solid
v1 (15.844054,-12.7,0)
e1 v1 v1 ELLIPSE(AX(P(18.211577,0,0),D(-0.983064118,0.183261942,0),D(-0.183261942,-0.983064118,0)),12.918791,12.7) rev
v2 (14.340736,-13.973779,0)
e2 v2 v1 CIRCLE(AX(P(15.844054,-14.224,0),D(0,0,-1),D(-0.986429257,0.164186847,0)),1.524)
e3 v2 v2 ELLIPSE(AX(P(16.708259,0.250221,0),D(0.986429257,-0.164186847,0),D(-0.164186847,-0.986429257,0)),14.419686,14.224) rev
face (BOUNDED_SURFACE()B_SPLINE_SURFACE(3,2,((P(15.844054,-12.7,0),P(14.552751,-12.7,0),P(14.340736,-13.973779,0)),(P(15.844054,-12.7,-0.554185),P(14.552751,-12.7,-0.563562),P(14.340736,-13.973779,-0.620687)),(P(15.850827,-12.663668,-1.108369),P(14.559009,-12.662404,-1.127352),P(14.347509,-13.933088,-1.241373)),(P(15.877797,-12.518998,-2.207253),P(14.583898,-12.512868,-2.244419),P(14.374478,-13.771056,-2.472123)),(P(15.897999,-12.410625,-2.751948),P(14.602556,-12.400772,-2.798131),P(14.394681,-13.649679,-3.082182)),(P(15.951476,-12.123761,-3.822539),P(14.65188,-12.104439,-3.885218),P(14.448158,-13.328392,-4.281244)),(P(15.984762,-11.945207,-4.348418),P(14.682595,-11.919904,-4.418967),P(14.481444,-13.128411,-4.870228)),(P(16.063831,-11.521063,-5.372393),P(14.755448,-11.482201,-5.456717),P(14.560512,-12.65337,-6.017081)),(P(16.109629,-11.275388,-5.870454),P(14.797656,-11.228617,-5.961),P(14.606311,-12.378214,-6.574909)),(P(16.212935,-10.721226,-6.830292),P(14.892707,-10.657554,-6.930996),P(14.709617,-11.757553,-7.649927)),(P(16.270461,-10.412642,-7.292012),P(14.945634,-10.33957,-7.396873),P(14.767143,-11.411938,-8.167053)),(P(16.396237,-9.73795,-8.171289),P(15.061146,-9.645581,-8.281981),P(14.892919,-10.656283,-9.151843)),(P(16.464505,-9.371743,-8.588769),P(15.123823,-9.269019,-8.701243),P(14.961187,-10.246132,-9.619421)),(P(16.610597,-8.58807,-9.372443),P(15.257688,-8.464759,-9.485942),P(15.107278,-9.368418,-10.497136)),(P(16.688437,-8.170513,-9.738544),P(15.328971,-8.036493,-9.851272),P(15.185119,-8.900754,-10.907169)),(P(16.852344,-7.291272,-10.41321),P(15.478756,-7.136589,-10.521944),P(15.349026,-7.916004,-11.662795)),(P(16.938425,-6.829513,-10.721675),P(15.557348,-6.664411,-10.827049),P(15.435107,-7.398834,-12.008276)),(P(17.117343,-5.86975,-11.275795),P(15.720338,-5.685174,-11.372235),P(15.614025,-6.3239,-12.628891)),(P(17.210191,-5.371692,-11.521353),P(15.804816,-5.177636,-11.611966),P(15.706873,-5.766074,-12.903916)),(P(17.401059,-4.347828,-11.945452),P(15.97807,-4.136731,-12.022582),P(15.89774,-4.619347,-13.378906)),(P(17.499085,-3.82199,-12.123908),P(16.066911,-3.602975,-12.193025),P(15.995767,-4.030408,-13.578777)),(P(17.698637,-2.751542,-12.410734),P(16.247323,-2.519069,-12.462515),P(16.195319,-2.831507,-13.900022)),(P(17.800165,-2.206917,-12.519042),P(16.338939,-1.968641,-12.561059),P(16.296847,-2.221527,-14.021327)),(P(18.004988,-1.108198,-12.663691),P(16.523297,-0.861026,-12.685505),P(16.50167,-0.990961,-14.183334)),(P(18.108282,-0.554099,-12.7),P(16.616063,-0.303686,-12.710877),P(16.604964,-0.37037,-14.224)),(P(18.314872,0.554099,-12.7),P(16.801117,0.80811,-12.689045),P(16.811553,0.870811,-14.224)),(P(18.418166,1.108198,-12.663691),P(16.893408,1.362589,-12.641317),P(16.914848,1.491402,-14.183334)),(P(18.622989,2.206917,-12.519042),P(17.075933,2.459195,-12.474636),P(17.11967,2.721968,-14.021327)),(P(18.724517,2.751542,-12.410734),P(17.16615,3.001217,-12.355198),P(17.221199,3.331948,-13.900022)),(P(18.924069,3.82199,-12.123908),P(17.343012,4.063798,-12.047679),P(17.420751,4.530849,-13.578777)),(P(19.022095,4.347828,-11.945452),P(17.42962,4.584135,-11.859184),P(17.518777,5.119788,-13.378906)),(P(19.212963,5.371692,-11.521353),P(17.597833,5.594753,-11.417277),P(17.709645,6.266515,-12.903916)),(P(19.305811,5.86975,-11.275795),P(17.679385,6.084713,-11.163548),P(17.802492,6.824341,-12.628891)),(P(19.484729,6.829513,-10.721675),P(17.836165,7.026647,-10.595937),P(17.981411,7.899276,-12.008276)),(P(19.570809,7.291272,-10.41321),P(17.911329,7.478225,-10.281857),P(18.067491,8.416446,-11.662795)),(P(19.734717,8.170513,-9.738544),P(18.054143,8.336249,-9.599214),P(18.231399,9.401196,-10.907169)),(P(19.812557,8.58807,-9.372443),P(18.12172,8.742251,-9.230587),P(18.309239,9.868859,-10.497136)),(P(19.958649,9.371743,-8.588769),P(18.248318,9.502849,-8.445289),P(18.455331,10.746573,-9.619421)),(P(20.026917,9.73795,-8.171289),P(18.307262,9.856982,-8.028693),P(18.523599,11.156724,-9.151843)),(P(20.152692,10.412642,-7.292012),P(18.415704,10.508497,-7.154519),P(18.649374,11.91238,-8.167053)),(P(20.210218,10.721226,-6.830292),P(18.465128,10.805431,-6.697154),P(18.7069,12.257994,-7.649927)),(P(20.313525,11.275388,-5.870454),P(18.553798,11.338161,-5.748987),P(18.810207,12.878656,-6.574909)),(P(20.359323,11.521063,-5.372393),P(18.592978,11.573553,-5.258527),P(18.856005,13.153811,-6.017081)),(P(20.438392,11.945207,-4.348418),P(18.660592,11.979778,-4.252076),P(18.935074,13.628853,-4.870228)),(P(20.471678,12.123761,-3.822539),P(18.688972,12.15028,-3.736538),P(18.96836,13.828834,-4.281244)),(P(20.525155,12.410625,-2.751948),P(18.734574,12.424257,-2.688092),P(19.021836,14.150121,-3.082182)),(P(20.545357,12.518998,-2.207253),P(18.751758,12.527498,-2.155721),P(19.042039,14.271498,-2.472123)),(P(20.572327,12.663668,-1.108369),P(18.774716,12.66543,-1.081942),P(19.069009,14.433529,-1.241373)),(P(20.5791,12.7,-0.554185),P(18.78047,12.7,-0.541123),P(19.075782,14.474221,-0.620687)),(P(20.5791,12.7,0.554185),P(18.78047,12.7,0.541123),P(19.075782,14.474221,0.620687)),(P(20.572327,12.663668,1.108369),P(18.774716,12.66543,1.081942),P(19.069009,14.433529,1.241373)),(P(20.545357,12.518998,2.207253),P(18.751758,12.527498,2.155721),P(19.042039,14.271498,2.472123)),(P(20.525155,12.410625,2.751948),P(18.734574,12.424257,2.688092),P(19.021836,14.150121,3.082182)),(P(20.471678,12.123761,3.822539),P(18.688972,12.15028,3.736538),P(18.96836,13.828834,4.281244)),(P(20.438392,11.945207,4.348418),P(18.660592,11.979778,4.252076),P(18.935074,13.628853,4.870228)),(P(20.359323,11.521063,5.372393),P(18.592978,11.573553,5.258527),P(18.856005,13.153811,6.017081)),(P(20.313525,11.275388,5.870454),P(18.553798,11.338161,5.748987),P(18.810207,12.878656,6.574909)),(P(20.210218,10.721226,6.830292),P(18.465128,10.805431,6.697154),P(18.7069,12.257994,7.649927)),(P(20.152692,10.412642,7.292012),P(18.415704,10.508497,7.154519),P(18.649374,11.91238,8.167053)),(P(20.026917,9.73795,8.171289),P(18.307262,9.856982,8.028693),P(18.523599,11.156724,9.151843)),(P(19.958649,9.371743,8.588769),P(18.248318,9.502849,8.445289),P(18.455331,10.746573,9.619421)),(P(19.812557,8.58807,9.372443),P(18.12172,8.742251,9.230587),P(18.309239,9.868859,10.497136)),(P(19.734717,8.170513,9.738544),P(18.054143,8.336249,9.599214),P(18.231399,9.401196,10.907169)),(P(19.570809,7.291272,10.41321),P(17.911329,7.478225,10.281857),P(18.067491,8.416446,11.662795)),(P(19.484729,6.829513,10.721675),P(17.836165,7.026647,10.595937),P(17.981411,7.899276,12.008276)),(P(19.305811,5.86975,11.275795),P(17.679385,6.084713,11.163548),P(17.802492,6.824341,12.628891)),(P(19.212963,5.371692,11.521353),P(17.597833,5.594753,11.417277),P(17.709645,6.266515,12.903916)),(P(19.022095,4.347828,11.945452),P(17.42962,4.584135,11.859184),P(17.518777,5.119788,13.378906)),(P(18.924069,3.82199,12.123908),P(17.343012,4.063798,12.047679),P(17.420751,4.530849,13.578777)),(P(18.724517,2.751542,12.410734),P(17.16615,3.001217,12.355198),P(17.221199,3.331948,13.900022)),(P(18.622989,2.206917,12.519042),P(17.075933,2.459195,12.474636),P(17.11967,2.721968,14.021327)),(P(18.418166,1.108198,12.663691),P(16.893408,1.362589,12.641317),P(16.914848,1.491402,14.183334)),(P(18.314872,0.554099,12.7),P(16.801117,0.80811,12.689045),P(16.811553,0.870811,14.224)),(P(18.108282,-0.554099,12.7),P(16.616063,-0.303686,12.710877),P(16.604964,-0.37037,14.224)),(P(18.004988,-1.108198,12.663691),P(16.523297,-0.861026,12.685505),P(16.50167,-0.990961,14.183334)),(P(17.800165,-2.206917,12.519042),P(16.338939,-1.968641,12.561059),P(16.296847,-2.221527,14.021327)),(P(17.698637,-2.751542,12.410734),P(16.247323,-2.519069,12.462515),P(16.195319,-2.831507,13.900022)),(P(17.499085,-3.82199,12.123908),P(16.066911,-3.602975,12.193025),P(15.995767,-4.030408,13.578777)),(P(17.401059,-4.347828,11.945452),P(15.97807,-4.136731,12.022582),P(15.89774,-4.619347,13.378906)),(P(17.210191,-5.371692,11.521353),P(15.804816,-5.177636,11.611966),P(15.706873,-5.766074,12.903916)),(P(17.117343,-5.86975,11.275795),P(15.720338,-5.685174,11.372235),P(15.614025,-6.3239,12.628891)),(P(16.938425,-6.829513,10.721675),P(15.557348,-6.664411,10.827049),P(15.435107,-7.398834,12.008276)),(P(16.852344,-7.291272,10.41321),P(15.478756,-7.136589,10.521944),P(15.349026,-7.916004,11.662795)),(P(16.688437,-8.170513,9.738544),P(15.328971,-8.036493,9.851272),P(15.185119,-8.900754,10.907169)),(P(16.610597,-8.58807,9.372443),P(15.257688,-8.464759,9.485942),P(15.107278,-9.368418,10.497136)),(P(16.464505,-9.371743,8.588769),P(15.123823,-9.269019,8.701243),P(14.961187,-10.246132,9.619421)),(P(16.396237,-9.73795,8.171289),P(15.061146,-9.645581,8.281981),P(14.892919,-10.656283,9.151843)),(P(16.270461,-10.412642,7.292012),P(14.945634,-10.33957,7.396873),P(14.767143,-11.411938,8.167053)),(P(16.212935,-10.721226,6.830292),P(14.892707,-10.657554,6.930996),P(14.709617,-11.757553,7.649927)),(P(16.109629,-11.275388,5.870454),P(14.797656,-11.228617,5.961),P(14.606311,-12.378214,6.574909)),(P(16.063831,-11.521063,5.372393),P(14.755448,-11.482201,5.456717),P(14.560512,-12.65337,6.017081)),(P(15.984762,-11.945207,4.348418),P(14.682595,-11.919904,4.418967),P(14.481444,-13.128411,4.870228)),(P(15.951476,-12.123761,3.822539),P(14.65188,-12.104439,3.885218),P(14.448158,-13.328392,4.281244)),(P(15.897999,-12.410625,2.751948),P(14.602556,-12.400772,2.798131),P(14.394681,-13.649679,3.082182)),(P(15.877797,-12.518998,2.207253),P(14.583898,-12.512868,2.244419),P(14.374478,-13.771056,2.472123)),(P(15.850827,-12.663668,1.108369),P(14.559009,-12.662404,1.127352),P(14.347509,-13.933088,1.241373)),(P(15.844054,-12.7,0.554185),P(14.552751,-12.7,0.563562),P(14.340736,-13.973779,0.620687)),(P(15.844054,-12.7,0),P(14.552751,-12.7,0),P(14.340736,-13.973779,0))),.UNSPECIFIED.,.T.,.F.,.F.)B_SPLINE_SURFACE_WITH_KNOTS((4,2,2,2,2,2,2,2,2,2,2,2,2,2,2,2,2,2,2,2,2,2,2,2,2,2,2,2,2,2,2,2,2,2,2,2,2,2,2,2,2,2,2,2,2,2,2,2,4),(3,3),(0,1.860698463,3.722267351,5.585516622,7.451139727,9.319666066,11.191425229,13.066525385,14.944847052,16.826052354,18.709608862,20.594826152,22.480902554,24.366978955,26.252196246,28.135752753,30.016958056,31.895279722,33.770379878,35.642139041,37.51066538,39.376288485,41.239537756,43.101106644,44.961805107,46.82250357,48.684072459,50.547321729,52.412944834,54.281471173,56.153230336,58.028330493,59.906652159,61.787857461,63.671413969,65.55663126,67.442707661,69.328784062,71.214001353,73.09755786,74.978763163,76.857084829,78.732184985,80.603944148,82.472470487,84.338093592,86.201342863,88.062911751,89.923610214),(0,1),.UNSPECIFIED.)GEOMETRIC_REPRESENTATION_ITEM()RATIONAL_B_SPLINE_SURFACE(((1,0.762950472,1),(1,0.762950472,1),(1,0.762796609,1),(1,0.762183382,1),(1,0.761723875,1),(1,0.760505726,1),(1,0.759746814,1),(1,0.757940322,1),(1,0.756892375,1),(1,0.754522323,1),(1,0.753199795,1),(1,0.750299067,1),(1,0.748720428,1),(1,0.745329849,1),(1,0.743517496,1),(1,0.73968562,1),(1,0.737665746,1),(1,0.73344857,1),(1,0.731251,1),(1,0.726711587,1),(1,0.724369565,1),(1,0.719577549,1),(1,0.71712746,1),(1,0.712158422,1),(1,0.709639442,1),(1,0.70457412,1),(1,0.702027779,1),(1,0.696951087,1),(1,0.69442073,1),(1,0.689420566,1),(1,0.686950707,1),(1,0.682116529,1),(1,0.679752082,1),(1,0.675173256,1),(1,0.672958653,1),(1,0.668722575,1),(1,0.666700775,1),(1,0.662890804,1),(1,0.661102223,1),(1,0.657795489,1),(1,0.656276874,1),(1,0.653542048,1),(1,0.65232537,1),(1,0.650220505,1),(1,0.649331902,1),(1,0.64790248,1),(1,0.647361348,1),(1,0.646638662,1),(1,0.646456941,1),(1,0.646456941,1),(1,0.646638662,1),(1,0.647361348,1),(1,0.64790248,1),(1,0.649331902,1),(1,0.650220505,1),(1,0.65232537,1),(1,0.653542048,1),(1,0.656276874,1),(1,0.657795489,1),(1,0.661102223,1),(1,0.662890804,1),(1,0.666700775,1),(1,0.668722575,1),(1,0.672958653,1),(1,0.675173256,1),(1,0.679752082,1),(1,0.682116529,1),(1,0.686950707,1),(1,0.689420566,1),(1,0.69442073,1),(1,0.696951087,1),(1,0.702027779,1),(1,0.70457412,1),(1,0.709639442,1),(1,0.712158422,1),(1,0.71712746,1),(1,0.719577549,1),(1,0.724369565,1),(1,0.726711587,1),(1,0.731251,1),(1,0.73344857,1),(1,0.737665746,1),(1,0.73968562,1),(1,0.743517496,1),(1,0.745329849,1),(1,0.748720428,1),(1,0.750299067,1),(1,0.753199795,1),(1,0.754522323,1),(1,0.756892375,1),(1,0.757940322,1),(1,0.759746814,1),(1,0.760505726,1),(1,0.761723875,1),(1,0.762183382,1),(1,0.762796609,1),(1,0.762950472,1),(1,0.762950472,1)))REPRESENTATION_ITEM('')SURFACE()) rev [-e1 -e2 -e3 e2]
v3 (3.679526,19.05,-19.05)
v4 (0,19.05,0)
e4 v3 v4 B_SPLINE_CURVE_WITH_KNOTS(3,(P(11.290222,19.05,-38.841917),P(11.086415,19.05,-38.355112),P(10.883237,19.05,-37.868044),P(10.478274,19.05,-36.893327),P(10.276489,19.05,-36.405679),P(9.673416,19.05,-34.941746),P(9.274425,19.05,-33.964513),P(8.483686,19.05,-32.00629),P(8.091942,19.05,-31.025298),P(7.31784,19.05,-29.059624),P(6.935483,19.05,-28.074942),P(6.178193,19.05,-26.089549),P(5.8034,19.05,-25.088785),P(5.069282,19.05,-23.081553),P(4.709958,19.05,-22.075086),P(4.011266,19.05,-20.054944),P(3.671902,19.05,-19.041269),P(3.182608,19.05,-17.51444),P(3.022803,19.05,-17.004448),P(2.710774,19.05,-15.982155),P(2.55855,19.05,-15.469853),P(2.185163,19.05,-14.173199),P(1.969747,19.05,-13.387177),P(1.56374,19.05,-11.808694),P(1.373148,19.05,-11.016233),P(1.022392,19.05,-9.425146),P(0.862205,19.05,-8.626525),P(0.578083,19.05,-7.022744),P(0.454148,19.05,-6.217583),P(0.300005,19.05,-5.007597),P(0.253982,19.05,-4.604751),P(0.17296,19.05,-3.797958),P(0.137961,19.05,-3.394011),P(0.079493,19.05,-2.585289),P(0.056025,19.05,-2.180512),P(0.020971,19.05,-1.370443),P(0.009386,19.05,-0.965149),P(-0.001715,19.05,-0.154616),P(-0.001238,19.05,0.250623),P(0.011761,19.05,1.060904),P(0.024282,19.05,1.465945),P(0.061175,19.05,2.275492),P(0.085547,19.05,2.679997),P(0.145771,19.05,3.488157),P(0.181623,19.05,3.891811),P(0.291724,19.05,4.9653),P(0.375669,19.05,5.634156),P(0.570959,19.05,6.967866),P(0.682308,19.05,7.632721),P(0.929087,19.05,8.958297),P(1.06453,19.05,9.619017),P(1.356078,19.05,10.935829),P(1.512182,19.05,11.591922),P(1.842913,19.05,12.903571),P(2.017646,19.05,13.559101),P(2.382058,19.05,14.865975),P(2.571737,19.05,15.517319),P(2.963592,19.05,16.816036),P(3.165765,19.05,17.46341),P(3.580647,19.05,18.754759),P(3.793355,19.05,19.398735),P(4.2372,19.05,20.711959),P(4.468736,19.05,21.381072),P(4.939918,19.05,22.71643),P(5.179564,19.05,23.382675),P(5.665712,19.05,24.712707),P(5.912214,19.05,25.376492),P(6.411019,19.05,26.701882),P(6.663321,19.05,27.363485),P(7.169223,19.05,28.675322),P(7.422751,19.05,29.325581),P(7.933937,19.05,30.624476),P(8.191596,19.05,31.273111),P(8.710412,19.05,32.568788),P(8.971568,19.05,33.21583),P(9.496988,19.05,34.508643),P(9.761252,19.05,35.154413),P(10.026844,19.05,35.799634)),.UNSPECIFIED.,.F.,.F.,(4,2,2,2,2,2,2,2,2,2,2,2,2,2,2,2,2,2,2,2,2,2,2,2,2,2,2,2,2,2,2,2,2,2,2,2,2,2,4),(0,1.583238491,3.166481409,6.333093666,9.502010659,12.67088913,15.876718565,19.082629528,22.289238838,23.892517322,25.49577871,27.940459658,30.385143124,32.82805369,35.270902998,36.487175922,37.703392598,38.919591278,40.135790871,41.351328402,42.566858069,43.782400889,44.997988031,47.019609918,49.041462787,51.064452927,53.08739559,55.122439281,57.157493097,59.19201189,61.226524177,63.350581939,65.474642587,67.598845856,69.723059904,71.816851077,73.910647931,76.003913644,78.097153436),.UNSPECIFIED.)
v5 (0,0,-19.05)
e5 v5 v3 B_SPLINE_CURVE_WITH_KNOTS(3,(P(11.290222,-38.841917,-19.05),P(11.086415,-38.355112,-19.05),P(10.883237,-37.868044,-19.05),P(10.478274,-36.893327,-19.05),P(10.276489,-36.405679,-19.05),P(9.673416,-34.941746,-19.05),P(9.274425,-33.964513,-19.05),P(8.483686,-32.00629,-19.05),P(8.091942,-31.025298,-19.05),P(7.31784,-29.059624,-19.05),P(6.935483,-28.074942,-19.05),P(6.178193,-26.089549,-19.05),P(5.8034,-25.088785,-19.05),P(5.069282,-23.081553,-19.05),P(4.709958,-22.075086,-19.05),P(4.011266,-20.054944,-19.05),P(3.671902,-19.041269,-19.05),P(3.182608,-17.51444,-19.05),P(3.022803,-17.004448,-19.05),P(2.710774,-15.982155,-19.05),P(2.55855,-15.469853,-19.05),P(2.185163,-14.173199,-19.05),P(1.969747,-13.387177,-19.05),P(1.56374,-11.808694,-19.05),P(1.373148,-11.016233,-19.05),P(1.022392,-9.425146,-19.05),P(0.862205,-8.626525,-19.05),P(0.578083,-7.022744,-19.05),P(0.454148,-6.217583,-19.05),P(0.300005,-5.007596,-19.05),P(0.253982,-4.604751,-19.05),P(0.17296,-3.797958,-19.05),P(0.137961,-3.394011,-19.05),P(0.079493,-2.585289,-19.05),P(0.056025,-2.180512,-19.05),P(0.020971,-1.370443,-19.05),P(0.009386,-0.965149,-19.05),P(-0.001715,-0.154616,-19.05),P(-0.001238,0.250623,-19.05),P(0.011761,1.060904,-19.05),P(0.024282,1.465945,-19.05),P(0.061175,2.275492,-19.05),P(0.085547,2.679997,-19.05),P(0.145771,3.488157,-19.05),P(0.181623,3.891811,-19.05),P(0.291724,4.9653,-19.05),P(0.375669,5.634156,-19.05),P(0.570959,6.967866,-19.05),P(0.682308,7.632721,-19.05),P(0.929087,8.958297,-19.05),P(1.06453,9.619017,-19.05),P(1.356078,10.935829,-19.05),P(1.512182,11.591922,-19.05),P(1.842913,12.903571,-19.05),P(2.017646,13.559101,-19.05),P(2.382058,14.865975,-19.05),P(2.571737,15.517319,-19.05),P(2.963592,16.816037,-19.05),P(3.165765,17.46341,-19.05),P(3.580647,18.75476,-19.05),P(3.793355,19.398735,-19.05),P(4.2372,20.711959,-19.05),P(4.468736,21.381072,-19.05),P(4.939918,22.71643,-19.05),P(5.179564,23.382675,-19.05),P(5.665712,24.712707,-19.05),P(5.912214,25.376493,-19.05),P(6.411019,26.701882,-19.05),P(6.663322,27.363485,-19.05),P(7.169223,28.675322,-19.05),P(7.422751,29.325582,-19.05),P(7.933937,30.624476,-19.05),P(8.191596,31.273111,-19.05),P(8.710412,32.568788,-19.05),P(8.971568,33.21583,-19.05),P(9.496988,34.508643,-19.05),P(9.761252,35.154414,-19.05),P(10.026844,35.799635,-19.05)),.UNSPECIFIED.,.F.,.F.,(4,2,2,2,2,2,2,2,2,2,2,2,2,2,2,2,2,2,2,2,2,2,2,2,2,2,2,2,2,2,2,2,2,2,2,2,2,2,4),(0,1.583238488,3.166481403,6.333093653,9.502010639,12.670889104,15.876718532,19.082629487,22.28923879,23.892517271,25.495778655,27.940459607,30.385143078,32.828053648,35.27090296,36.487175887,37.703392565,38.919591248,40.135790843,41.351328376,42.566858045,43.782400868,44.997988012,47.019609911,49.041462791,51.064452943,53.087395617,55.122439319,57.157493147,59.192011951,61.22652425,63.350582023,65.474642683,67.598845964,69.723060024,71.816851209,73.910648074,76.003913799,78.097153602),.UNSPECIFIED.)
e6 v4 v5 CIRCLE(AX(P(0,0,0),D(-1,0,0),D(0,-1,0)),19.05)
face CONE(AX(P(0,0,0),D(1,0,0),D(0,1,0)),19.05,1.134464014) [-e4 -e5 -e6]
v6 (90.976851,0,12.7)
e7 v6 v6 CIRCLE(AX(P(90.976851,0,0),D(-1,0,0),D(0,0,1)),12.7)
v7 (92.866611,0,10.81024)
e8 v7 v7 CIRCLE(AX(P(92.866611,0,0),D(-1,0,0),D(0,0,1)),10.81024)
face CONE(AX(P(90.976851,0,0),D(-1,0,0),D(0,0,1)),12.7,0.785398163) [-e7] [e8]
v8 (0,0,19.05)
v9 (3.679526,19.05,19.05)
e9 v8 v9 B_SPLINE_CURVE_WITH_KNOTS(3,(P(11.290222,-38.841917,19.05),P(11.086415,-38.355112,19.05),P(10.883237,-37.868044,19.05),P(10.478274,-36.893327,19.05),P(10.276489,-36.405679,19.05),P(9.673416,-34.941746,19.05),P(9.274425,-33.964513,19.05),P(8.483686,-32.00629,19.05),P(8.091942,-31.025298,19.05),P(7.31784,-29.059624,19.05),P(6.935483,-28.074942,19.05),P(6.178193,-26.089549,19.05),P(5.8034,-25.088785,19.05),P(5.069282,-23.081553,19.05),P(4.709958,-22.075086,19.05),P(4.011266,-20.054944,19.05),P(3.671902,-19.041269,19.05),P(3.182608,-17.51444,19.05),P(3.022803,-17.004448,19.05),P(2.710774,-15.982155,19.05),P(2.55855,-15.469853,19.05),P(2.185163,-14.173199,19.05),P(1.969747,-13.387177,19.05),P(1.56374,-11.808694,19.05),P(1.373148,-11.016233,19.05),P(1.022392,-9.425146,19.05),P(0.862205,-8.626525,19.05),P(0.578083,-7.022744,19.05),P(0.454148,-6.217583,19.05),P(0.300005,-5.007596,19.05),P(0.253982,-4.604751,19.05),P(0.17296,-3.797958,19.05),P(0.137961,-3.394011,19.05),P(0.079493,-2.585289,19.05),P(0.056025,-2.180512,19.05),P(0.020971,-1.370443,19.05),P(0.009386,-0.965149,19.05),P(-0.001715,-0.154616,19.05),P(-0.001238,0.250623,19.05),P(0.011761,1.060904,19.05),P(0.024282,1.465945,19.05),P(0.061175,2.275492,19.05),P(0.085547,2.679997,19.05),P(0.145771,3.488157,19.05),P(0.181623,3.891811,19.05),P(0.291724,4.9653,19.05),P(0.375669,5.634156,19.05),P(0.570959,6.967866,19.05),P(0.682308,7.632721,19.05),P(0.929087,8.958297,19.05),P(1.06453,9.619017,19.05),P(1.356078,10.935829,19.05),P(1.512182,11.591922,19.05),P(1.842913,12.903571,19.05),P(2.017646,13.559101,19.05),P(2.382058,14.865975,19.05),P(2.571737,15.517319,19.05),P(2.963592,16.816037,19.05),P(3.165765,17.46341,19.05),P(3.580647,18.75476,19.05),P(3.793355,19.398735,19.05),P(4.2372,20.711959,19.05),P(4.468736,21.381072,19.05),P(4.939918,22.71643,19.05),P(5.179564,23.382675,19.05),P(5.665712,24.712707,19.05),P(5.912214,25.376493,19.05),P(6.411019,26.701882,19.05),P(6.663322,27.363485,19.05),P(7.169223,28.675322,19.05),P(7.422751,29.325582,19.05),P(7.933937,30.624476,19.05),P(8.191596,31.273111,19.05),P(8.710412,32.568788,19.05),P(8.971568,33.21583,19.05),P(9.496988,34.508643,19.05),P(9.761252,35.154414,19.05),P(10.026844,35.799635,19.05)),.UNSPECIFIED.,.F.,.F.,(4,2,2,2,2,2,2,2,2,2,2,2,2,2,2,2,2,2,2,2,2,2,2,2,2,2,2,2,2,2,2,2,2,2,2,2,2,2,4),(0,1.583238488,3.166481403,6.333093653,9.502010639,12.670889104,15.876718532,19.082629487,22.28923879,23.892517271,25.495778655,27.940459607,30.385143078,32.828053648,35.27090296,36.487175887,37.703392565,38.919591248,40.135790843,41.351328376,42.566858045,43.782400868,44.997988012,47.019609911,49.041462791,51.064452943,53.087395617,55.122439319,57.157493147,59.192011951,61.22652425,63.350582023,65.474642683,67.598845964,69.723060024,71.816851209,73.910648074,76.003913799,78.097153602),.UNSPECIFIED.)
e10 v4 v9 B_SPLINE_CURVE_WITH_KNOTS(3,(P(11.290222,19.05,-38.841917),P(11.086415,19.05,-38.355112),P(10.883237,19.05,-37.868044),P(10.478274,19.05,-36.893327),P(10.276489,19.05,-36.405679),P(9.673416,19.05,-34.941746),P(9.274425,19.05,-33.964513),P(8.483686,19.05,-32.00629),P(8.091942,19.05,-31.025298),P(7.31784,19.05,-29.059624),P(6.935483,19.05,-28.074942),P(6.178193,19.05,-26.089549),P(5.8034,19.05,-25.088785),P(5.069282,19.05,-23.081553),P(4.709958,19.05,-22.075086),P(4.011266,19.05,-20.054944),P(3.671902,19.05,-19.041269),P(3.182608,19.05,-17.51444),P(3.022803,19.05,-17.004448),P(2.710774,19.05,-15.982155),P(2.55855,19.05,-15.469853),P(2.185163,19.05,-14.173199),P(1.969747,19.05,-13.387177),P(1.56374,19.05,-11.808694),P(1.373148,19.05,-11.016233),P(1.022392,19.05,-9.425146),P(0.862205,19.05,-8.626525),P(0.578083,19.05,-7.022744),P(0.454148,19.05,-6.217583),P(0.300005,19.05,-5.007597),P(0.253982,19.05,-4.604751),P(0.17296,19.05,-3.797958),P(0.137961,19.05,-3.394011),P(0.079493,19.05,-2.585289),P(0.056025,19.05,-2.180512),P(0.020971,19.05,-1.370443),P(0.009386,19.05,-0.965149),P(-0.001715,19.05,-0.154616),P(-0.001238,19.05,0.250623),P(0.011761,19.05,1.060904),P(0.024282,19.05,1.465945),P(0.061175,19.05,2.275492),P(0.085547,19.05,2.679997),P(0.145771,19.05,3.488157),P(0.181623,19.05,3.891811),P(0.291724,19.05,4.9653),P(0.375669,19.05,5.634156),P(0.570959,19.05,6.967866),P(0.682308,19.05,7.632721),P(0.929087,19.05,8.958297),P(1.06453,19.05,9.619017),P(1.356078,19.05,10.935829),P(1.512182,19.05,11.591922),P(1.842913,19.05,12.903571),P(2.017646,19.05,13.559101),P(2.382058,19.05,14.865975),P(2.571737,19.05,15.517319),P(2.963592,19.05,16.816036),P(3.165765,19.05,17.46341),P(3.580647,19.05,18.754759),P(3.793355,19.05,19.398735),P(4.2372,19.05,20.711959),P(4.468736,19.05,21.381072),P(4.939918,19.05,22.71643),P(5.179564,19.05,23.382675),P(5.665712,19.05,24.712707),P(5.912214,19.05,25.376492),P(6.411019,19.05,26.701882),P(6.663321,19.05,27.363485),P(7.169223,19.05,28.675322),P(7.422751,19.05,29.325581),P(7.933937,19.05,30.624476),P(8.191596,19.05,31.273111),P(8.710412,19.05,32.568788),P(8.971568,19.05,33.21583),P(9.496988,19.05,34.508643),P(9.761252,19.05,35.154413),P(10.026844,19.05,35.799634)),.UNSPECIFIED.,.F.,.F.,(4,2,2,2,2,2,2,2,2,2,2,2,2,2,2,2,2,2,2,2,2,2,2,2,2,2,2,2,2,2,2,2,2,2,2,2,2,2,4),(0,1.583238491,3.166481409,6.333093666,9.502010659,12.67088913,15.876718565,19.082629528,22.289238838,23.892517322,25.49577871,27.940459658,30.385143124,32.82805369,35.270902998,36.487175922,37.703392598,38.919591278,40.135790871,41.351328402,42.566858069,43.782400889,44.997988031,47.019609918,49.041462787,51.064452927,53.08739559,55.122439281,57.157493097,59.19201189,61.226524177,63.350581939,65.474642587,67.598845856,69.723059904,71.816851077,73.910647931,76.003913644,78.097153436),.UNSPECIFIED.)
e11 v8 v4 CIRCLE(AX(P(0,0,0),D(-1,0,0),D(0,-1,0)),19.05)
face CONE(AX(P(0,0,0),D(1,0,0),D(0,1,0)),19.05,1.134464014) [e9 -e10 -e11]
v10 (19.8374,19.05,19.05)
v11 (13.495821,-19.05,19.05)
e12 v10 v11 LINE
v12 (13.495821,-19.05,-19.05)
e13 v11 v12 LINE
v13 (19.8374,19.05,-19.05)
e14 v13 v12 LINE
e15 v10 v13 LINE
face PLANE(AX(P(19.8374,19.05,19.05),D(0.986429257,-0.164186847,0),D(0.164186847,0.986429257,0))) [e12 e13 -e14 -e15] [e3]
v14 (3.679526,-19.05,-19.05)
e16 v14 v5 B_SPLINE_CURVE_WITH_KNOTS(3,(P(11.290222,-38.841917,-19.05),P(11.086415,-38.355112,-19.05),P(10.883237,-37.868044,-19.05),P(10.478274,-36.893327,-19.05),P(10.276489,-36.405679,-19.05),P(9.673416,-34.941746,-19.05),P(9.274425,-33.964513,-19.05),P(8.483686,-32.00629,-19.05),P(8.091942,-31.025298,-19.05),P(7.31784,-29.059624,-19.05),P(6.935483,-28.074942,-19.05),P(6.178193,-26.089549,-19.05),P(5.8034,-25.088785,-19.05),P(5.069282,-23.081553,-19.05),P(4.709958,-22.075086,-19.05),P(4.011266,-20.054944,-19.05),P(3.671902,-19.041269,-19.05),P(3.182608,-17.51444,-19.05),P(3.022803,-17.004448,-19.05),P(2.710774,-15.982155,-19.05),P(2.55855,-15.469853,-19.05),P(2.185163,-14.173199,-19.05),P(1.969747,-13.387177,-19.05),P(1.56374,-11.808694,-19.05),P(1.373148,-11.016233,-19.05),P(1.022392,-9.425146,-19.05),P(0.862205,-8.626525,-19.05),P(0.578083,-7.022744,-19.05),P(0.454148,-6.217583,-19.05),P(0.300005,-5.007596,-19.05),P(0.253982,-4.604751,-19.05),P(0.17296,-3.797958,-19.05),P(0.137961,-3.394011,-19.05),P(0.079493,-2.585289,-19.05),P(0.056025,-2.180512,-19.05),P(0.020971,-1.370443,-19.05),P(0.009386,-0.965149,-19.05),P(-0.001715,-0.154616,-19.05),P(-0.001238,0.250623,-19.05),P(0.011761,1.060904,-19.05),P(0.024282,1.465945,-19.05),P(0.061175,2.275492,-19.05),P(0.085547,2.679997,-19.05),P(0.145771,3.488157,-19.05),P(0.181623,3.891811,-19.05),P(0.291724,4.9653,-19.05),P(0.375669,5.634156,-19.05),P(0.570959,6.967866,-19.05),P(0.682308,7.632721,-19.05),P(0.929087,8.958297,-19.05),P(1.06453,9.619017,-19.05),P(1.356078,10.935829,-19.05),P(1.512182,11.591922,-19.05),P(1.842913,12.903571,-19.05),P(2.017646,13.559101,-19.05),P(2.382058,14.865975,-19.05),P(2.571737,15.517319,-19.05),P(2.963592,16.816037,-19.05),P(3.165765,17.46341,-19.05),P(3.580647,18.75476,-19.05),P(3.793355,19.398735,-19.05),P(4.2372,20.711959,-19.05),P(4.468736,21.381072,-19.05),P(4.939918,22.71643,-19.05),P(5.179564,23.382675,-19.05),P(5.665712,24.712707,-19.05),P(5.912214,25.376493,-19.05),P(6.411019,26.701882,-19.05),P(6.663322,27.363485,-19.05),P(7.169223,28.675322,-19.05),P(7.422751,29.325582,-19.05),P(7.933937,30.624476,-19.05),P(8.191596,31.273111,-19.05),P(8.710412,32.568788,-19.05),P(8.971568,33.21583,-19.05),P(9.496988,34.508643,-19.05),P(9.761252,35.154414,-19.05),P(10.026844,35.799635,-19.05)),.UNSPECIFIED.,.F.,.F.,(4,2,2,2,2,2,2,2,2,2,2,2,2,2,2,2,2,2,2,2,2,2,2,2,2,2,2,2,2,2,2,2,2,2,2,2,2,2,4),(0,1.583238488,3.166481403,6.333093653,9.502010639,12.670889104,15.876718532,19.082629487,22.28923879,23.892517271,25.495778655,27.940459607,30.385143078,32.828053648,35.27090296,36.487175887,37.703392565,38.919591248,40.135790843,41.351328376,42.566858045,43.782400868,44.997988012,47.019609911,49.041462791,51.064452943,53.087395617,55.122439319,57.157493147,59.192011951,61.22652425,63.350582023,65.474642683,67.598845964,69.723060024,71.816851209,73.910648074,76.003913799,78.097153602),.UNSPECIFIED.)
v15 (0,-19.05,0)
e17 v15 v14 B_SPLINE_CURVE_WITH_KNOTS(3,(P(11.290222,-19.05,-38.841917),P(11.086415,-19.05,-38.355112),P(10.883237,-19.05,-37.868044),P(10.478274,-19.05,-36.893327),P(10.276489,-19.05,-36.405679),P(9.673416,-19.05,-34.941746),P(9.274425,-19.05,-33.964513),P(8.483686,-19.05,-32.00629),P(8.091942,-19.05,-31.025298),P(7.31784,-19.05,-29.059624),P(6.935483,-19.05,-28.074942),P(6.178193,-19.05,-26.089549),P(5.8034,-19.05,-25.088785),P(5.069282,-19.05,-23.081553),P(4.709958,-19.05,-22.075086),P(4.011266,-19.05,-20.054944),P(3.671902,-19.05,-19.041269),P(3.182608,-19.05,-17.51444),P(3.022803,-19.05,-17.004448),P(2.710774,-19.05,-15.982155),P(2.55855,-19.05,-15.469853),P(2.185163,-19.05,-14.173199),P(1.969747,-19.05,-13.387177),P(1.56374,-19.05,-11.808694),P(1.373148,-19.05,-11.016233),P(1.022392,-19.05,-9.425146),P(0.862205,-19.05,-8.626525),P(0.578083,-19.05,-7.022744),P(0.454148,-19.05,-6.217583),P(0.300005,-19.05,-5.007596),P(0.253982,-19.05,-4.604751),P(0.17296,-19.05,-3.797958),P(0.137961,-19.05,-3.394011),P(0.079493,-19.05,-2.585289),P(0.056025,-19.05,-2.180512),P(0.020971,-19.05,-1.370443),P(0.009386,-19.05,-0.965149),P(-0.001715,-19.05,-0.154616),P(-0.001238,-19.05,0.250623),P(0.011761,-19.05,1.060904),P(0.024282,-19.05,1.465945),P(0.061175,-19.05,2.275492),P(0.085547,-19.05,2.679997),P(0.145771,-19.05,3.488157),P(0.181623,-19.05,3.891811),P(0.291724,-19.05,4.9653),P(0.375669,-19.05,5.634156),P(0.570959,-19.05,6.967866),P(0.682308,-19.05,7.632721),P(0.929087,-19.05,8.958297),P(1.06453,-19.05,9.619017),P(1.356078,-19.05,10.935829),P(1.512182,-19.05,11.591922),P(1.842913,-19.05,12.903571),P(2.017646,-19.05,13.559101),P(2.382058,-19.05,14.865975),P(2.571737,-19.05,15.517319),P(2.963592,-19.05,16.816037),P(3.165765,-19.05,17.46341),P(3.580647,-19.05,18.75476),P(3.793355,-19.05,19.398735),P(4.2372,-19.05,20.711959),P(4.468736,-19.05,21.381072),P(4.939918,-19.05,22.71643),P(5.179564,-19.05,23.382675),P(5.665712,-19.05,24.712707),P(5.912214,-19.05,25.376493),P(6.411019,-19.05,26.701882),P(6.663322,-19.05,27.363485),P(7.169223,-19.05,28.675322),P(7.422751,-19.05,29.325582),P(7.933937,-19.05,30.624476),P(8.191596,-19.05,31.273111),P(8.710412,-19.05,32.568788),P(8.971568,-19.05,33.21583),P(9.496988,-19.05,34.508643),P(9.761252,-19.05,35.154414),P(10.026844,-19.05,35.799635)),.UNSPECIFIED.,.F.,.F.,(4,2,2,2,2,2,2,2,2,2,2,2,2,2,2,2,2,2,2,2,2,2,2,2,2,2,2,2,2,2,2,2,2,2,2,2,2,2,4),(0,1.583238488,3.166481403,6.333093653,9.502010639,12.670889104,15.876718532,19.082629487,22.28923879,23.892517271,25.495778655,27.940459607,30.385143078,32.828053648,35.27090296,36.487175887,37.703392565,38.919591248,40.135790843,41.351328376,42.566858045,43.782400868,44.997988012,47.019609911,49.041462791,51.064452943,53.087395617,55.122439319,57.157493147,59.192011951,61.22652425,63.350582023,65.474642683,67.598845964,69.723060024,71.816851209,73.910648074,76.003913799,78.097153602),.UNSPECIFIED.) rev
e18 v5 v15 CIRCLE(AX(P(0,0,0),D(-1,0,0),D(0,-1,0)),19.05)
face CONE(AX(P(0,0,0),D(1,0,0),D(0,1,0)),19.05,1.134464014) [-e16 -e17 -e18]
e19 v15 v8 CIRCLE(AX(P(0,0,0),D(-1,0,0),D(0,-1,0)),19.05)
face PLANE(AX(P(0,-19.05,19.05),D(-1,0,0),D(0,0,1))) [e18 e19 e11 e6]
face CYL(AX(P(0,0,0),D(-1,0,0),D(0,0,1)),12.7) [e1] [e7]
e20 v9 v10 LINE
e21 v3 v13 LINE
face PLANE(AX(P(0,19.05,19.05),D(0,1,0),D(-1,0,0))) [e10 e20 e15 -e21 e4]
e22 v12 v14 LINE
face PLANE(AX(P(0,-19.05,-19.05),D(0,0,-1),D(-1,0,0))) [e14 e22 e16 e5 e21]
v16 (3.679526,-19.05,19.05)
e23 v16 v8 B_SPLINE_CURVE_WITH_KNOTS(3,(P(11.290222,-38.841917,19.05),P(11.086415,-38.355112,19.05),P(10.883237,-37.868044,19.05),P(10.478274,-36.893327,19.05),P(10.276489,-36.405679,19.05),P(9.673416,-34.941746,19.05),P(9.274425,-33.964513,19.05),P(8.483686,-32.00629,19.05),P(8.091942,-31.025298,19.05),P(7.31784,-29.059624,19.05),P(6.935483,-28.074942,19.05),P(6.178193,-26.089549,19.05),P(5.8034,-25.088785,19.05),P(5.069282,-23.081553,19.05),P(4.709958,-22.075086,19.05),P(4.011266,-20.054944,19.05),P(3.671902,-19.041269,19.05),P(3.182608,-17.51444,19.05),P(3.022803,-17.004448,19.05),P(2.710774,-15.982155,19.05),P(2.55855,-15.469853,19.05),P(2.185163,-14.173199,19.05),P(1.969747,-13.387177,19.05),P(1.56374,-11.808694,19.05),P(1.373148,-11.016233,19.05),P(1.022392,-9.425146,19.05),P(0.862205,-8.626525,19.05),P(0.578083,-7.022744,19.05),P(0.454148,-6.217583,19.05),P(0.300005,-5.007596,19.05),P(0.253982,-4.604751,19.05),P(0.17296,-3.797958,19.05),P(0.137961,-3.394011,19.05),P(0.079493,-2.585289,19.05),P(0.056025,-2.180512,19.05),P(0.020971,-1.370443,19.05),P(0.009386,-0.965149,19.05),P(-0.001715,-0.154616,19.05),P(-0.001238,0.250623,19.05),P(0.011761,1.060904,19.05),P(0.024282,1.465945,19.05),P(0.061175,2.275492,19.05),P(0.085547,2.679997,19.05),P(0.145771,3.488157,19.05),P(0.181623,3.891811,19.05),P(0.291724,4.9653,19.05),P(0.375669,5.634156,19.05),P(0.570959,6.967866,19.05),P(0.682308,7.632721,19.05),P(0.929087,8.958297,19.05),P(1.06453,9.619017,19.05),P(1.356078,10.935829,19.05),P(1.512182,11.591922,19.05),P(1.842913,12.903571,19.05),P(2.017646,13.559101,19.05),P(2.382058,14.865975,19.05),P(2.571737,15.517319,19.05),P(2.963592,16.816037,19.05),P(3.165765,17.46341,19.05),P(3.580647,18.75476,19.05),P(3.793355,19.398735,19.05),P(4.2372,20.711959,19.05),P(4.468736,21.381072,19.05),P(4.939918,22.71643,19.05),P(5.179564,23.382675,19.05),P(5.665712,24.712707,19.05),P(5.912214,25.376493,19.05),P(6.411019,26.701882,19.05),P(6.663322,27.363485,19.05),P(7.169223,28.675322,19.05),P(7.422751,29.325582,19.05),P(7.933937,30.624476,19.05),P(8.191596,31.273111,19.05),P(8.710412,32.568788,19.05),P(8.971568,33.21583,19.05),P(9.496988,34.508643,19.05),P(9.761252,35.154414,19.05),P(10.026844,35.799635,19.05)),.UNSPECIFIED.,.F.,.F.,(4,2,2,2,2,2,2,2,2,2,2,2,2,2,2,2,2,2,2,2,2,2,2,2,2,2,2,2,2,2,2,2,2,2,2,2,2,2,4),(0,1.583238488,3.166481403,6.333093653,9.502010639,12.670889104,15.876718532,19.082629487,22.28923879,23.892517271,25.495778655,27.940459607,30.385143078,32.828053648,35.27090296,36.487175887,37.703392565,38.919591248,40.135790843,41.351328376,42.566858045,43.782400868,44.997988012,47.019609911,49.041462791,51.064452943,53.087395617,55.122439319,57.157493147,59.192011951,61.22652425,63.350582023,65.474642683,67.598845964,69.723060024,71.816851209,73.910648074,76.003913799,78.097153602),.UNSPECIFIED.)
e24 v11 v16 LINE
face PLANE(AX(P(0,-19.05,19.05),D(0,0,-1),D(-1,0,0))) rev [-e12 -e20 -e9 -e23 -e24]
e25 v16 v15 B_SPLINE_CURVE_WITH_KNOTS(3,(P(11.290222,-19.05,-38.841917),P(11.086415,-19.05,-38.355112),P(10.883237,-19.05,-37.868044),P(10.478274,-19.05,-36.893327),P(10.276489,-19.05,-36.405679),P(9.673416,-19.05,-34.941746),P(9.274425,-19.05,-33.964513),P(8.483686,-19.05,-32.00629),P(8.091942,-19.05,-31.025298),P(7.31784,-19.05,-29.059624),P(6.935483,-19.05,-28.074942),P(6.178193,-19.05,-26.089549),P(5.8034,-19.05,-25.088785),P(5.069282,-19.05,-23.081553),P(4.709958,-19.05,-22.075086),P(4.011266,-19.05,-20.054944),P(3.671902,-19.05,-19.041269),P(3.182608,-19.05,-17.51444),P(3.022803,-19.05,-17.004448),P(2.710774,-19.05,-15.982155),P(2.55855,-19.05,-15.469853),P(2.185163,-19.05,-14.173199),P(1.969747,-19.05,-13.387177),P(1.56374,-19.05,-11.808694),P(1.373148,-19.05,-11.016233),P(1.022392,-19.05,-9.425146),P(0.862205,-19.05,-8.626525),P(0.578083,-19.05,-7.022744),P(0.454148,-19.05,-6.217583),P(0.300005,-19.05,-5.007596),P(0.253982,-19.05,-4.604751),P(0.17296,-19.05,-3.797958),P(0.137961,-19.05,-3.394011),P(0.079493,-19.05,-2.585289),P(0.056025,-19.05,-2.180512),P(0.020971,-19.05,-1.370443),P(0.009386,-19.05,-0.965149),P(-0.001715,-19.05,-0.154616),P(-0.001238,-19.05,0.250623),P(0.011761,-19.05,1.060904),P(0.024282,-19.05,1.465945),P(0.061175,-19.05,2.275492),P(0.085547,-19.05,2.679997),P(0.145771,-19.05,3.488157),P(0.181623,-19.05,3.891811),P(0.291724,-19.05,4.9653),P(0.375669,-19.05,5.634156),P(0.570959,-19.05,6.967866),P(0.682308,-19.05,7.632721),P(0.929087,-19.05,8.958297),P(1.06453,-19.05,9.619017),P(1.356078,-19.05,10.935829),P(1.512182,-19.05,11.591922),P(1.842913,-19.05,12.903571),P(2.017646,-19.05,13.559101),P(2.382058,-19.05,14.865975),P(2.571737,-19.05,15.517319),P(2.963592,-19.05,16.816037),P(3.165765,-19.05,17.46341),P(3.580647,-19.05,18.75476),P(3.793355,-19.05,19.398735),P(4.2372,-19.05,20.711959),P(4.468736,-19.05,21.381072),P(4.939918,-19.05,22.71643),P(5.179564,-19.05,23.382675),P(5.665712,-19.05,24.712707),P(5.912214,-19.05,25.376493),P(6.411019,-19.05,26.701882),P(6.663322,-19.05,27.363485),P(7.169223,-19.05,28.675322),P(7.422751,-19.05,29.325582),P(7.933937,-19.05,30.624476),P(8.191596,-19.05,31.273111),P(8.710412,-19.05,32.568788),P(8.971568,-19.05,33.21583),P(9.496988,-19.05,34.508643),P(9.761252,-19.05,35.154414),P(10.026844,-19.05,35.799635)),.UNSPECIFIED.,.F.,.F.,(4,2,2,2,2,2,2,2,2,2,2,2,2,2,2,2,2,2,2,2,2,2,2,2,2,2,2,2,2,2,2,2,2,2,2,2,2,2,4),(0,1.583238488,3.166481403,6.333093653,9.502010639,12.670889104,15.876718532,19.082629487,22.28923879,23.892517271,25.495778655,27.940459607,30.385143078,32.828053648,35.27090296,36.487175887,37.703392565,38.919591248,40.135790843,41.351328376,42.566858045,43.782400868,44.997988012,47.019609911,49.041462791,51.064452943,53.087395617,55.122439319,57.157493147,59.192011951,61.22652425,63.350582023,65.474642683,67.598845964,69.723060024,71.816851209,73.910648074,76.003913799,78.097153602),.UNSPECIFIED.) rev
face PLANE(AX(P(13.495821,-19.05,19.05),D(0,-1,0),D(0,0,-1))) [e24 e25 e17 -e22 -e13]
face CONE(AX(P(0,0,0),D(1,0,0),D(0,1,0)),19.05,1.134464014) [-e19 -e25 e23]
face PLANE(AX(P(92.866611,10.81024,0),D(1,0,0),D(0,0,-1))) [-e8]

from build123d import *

# Parameters (mm, degrees)
BASEHEAD_DEPTH = 19.05
HEADFILLET_R   = 1.524


with BuildPart() as part:
    # Sketch1 → BaseHead (new, symmetric)
    with BuildSketch(Plane.XY):
        Polygon((0, -19.05), (0, 19.05), (19.8374, 19.05), (13.495821211, -19.05), align=None)
    extrude(amount=BASEHEAD_DEPTH, both=True)

    # BodySke → Body (revolve)
    with BuildSketch(Plane.XY, mode=Mode.PRIVATE) as body_sk:
        Polygon((0, 0), (0, 12.7), (90.976850605, 12.7), (92.866610605, 10.81024), (92.866610605, 0), align=None)
    revolve(body_sk.sketch.rotate(Axis((0, 0, 0), (1, 0, 0)), 90), axis=Axis((0, 0, 0), (1, 0, 0)))

    # Sketch3 → HeadChamfer (revolve, cut)
    with BuildSketch(Plane(origin=(0, 0, 0), x_dir=(1, 0, 0), z_dir=(0, -0.7071067811865476, 0.7071067811865475))):
        Polygon((0, 19.05), (9.601632975, 39.640768363), (-6.35, 39.640768363), (-6.35, 19.05), align=None)
    revolve(axis=Axis((0, 0, 0), (1, 0, 0)), mode=Mode.SUBTRACT)

    # HeadFillet
    headfillet_edges = [part.edges().sort_by_distance(p)[0] for p in [
        (16.666610593, -7.7e-08, -12.7),
    ]]
    fillet(headfillet_edges, radius=HEADFILLET_R)


solid = part.part
